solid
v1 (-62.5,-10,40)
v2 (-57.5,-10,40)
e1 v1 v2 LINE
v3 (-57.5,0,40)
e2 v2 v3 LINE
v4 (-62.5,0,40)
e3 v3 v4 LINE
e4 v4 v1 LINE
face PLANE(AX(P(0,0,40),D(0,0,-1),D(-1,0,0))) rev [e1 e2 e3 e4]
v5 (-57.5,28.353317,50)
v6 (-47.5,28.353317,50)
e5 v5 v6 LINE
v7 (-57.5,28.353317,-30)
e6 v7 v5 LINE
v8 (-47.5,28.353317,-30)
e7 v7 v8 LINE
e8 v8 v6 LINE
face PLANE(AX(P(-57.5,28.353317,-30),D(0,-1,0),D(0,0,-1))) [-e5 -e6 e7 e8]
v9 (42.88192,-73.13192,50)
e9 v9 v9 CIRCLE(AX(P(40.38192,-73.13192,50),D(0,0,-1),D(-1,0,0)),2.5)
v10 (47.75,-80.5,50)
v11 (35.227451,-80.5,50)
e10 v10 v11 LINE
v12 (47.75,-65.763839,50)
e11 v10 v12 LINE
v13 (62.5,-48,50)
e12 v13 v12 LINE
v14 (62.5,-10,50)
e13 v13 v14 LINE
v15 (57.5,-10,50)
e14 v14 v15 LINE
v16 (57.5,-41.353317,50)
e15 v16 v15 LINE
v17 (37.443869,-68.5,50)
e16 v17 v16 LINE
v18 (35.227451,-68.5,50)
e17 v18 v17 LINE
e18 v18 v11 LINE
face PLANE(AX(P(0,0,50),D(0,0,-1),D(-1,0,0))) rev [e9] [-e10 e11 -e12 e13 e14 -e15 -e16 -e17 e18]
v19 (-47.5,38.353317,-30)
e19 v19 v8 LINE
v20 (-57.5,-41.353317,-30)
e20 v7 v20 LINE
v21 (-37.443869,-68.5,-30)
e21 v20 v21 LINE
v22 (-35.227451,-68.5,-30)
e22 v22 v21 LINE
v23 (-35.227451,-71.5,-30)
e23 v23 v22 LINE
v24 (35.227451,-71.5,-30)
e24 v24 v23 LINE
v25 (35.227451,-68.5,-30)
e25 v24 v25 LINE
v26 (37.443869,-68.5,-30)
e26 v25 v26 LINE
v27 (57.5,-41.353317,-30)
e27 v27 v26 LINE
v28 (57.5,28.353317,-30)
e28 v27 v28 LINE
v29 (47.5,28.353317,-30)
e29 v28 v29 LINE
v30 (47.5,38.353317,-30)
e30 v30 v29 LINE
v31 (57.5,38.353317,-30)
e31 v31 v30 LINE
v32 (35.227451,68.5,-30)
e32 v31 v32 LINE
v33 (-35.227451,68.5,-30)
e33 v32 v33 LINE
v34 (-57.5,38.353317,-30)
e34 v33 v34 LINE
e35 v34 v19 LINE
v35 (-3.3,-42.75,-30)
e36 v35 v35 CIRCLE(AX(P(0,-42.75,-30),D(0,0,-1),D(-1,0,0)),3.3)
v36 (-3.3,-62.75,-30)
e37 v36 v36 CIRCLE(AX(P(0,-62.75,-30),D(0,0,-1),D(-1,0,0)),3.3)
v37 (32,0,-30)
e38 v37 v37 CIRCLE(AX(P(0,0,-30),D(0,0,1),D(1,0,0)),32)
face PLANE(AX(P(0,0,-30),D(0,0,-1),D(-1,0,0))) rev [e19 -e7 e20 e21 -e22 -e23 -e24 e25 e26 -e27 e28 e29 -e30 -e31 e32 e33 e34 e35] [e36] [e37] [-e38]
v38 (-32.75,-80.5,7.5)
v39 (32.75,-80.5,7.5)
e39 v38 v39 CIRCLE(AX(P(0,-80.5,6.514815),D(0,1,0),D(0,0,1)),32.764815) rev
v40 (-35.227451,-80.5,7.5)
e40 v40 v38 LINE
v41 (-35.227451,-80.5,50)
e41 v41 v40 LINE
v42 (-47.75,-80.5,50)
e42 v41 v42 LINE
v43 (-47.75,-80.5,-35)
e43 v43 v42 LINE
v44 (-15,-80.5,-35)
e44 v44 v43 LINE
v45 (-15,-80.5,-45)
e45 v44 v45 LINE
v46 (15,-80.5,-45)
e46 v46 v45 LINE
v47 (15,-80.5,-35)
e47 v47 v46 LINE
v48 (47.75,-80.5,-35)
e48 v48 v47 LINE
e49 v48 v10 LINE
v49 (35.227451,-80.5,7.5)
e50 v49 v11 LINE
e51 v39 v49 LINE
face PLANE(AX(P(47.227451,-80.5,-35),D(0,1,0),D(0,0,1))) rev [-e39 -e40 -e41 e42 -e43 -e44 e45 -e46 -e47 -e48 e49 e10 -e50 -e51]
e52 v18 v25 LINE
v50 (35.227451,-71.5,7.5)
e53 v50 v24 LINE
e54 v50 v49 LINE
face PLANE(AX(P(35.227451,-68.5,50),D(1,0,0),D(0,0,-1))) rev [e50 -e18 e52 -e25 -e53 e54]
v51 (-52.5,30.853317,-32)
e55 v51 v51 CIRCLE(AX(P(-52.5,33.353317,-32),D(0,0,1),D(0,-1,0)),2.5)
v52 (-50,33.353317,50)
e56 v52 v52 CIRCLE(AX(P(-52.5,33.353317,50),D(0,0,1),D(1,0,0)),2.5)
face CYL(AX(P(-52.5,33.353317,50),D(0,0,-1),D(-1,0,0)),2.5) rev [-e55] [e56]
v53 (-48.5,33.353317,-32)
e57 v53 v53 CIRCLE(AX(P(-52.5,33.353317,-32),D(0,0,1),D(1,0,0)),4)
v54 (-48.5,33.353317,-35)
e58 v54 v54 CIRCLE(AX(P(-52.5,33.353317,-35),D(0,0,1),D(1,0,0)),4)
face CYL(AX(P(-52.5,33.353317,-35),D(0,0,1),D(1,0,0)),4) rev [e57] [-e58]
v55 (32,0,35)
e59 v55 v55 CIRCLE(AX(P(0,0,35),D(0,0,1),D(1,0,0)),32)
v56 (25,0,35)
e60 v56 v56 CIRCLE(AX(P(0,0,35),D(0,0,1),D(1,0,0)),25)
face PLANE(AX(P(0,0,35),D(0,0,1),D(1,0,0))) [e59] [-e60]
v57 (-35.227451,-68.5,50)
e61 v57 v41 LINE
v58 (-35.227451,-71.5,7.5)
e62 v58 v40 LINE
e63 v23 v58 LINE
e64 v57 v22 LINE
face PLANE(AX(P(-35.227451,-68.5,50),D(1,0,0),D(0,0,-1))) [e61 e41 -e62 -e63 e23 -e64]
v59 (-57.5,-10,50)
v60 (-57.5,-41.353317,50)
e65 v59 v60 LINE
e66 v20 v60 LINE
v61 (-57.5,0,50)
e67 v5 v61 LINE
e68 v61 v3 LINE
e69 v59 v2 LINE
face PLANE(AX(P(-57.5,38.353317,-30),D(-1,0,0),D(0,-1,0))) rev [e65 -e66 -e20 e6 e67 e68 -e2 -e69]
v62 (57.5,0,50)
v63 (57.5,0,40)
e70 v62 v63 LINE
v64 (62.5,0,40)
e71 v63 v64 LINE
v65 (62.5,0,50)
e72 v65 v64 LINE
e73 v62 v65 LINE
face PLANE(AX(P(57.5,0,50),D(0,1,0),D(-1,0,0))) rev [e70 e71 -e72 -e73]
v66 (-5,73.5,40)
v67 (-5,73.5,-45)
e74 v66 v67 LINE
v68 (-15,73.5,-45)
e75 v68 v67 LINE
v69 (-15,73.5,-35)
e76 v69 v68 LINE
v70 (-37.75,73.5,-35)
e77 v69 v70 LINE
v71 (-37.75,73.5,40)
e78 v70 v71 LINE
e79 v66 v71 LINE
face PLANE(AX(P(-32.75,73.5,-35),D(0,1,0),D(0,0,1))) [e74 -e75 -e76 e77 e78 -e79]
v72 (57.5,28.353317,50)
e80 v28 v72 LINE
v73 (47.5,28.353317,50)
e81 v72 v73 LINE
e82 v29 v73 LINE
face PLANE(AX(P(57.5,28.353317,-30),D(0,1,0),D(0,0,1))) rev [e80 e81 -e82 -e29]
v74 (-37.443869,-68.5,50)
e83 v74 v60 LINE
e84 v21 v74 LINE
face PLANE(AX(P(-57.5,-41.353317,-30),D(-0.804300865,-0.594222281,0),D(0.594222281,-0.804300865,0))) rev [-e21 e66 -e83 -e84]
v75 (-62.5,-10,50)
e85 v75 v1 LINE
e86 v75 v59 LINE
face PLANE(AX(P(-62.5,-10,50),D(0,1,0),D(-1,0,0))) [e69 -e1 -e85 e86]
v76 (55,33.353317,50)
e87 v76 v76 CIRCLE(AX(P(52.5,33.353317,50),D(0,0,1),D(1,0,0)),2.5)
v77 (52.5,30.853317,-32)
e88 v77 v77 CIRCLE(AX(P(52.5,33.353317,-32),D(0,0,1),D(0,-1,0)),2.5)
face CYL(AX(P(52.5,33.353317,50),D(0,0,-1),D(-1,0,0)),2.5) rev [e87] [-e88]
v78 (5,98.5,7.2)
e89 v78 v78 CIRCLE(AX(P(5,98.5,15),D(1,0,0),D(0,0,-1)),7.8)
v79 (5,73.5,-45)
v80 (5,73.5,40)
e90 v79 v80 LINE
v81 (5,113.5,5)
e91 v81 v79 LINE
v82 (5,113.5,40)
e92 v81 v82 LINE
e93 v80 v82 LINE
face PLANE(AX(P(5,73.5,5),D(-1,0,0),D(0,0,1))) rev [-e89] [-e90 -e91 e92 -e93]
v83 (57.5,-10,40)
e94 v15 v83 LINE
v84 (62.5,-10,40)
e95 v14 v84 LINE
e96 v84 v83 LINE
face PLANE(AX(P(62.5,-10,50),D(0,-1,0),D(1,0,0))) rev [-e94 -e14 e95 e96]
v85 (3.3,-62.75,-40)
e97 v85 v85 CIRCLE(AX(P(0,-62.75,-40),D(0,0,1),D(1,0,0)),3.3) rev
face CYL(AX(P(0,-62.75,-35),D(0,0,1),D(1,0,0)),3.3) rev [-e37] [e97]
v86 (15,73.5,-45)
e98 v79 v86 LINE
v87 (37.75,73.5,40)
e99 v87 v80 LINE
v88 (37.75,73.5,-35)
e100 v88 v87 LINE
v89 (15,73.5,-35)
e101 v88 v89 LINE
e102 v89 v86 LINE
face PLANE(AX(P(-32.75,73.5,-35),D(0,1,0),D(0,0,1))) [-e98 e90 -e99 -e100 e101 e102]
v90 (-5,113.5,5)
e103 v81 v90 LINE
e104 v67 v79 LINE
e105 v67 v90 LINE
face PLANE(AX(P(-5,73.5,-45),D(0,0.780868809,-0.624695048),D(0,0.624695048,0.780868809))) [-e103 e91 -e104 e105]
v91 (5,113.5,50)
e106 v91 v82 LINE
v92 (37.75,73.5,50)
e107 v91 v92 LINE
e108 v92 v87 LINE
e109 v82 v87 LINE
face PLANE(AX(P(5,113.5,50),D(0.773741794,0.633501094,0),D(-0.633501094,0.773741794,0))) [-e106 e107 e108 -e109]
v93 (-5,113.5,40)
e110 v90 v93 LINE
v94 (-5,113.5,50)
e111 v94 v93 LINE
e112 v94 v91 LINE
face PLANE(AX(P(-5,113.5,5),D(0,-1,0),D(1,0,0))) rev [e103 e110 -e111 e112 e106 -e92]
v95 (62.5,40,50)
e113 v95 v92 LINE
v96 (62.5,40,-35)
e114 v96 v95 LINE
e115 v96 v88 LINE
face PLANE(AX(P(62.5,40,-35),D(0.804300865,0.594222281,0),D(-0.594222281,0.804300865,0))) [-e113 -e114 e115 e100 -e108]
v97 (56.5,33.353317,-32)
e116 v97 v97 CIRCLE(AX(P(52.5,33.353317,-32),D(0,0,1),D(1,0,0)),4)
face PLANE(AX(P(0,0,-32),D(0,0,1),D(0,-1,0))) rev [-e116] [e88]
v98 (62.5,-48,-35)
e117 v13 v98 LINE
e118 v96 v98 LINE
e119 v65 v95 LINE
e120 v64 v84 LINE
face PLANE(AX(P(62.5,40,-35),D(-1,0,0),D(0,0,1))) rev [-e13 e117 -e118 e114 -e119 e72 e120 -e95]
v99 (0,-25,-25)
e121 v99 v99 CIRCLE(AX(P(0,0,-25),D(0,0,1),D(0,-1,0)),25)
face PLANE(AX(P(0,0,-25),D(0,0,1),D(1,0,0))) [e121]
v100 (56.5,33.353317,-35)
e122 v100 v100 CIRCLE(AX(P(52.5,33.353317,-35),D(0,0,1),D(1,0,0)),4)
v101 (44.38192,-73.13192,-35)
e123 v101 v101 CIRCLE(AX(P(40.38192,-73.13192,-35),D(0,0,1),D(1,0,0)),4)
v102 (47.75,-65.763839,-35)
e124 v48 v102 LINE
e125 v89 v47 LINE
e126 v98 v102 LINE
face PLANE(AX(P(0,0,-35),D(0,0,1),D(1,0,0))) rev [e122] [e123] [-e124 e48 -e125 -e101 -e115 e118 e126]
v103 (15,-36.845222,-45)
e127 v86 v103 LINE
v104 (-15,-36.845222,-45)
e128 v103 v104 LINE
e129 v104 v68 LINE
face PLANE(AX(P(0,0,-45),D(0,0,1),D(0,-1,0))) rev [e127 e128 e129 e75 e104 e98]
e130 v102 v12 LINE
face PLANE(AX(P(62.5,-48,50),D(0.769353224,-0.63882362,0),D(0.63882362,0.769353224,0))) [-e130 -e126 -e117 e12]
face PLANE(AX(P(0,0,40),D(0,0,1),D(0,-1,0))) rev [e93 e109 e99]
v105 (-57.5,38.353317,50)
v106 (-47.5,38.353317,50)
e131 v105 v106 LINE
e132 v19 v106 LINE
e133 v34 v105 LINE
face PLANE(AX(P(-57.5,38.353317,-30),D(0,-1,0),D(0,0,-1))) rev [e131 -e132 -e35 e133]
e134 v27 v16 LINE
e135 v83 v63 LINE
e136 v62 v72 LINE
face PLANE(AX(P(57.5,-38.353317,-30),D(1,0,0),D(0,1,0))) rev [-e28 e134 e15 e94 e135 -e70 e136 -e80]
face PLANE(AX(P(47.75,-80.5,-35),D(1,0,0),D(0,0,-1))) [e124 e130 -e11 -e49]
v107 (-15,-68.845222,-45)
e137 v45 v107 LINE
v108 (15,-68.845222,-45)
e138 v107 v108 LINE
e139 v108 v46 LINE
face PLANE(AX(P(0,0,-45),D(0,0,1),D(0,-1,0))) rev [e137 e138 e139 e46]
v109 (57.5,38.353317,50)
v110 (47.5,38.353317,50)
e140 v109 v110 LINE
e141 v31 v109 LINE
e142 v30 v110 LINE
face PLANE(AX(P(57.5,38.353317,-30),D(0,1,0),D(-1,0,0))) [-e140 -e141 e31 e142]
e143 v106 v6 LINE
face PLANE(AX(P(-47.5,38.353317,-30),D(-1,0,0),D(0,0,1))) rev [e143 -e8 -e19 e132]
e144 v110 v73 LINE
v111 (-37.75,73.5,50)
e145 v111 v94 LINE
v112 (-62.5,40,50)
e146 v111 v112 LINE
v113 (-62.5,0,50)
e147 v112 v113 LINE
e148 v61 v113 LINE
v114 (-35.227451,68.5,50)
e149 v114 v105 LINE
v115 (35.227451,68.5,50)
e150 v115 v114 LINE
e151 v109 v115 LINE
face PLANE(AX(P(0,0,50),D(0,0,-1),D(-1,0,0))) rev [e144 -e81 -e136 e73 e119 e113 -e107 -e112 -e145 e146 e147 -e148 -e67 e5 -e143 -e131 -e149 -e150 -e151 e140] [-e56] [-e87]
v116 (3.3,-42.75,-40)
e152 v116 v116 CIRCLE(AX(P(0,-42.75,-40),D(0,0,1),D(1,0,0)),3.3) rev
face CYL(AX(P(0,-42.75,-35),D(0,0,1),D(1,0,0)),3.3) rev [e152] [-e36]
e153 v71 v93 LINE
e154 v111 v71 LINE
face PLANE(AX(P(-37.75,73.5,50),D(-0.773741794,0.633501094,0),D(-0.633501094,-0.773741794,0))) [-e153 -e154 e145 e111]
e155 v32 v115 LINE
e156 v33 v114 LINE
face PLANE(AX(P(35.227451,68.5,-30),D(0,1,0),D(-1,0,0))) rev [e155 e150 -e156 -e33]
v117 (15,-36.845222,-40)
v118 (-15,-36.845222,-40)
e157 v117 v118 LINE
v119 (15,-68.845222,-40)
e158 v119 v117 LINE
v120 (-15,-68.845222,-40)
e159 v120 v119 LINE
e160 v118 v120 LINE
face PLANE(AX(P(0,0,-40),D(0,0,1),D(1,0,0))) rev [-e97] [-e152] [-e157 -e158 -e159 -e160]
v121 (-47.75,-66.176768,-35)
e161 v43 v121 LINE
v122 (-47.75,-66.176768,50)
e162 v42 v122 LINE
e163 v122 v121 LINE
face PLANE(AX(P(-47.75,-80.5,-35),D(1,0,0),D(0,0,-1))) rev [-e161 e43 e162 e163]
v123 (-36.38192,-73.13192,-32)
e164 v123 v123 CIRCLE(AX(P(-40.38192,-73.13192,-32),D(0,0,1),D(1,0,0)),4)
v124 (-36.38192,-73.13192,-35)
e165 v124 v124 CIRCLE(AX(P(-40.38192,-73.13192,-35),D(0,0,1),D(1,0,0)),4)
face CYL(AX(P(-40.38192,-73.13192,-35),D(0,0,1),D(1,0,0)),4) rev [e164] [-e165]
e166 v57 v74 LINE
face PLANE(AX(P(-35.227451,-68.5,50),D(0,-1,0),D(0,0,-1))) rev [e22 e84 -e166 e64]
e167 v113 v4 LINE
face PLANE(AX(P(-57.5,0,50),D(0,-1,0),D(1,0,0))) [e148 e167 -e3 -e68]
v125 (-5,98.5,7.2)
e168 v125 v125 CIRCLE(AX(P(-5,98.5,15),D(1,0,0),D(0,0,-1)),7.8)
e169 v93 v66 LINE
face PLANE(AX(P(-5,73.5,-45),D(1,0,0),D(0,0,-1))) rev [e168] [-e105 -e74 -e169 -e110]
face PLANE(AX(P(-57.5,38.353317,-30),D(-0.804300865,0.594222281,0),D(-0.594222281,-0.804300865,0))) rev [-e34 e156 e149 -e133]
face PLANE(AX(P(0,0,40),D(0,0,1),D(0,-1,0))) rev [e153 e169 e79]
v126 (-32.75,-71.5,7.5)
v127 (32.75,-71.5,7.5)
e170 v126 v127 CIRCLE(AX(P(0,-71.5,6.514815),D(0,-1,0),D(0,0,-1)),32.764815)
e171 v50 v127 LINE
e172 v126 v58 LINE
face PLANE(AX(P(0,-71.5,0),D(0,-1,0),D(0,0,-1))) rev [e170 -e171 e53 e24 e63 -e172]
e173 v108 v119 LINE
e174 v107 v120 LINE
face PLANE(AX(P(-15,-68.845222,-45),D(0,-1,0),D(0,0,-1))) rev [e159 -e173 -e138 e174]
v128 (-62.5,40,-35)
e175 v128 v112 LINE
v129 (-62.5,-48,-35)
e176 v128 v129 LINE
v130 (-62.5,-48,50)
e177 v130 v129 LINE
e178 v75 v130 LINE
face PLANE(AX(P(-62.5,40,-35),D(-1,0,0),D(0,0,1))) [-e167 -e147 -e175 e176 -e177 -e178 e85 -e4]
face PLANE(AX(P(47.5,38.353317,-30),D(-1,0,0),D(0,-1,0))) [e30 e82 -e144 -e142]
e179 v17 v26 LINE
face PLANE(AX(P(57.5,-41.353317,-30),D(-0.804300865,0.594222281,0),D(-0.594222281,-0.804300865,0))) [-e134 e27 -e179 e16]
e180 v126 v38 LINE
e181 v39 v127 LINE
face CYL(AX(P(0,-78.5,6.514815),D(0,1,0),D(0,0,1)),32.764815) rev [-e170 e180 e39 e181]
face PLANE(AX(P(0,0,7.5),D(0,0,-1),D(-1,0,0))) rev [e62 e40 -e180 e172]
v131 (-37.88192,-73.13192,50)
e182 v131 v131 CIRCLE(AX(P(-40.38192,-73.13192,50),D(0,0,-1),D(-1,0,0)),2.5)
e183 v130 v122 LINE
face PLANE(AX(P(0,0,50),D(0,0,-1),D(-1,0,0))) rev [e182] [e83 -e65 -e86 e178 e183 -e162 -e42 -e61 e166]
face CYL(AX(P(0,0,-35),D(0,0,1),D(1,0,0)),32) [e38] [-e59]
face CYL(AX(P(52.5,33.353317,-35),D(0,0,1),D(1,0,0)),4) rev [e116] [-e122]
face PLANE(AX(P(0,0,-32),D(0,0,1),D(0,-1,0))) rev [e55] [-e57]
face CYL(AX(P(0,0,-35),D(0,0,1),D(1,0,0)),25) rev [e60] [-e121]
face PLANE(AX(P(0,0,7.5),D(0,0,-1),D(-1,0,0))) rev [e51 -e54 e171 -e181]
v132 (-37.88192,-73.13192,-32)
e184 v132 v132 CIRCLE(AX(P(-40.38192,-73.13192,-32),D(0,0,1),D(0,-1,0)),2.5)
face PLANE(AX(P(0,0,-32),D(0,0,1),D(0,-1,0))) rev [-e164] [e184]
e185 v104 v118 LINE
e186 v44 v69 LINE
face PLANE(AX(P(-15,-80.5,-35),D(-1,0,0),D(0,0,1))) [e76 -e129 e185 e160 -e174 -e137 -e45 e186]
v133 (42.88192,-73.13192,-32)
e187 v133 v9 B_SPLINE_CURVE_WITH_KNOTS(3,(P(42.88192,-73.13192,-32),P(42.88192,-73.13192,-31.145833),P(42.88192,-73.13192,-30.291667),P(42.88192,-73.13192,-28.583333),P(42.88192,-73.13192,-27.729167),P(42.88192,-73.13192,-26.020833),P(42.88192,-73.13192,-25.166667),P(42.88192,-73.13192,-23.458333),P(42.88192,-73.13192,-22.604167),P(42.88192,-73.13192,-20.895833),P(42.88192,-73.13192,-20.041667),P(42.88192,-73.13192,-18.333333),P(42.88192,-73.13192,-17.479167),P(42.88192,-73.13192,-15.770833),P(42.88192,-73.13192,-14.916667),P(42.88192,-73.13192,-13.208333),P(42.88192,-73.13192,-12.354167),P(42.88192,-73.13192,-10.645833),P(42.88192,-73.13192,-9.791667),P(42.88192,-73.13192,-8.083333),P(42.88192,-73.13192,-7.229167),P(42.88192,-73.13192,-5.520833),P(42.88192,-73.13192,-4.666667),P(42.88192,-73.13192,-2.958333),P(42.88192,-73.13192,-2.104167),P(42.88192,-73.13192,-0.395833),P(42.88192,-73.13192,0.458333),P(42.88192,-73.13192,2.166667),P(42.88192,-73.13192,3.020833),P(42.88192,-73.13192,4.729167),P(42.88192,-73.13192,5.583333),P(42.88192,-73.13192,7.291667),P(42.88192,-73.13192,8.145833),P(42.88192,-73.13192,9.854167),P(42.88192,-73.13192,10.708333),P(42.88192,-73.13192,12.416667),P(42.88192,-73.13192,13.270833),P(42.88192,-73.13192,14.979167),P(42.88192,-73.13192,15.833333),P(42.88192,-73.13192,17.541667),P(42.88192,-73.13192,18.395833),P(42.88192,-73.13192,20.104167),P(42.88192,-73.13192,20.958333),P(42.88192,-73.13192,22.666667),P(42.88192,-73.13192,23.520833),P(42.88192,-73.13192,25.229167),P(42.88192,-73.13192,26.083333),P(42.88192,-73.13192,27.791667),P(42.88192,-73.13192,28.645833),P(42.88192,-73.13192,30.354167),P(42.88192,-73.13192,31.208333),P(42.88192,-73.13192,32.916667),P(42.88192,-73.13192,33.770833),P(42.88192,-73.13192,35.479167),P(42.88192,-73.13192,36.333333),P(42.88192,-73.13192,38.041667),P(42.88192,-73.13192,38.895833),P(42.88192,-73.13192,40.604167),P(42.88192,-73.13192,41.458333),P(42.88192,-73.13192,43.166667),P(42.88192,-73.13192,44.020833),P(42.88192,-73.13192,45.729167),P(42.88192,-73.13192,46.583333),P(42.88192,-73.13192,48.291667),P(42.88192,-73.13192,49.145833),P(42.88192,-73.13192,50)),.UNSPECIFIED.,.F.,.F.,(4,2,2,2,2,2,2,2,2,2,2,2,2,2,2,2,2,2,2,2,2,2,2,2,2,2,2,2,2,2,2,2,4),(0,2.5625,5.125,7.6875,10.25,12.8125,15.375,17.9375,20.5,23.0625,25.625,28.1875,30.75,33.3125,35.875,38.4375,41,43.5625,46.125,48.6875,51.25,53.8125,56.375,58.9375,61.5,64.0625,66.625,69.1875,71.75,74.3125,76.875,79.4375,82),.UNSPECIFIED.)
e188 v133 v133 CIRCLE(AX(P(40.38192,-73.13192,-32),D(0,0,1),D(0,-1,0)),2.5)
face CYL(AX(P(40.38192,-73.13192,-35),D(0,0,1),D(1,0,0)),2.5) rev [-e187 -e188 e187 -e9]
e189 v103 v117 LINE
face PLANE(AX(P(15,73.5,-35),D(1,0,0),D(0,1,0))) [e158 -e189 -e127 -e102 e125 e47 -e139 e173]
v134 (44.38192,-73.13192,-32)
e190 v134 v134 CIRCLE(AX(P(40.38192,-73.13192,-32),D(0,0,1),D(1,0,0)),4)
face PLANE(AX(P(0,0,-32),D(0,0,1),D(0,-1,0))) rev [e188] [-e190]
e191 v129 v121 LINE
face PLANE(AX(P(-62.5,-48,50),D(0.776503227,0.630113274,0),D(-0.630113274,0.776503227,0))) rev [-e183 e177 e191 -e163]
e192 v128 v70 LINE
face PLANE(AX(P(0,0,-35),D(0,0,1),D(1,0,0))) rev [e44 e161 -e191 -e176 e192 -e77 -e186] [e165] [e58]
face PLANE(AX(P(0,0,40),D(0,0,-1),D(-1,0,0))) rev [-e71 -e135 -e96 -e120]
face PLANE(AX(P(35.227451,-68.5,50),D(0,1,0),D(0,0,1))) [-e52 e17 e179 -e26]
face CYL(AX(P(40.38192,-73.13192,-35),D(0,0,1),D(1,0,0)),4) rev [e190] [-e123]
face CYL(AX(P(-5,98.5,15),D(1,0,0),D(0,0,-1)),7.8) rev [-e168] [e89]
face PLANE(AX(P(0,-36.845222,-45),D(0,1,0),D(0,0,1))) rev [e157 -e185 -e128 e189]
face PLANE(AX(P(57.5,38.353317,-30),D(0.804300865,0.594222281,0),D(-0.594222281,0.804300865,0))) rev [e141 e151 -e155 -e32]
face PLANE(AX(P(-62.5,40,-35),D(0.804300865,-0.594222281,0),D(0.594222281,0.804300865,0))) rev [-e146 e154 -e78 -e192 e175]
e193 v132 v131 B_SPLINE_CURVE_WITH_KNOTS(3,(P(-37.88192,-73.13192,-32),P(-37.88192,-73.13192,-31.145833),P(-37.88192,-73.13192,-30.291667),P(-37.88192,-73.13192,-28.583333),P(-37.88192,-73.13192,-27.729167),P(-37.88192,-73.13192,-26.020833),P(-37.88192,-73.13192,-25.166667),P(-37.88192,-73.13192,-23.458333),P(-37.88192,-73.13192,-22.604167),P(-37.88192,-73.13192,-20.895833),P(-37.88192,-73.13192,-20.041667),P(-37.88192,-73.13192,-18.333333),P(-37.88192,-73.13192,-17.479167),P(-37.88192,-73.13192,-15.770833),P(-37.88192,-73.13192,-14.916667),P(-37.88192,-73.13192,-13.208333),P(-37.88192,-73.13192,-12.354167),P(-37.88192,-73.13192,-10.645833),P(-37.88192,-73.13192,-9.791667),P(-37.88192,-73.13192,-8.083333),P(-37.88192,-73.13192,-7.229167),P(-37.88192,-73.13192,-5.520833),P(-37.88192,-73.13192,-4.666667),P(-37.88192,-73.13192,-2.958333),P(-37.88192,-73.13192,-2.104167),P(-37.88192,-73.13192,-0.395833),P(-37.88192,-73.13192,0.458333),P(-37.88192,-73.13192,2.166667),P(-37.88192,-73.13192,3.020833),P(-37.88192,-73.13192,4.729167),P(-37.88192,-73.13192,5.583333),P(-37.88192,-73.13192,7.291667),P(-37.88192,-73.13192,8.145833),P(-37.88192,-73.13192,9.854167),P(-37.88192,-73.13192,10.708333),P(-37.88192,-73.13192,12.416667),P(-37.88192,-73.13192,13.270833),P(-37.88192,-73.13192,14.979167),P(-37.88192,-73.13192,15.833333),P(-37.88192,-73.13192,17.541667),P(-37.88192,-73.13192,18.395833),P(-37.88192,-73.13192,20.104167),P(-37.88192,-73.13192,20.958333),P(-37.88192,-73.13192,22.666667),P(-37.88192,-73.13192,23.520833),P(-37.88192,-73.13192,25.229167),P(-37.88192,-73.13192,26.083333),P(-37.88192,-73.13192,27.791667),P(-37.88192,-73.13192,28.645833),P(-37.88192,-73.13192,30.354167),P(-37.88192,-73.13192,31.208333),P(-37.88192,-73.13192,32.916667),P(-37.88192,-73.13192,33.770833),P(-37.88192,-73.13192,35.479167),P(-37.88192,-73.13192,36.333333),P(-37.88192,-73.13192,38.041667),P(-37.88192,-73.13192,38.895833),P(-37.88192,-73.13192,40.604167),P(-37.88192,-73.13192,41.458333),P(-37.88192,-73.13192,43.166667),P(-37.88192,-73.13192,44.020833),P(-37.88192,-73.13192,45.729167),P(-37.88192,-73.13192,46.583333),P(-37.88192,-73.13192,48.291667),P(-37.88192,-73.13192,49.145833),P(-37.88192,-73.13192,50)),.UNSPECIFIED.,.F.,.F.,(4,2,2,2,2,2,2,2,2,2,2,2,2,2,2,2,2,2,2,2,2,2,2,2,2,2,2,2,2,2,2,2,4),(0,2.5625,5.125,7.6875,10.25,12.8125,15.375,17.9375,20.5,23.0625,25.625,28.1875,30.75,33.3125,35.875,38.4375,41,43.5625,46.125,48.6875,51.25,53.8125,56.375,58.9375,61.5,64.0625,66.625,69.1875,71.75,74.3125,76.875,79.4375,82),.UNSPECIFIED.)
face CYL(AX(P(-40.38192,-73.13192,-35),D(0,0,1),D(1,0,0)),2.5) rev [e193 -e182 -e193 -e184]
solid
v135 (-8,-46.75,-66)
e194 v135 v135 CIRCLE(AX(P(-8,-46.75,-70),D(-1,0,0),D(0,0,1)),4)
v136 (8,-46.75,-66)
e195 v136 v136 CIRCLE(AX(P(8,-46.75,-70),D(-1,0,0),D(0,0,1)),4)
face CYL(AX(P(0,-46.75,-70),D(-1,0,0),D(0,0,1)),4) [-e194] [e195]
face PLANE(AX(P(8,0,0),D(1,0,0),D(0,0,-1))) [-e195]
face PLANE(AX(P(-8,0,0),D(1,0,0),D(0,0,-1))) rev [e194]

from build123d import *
from build123d.topology import SkipClean

# Parameters (mm, degrees)
ESTRUSIONE_ESTRUSIONE3_DEPTH       = 35
ESTRUSIONE_ESTRUSIONE3_DEPTH_BACK  = 35
SCHIZZO1_R                         = 32
SCHIZZO1_R_2                       = 25
SCHIZZO3D1_R                       = 32
ESTRUSIONE_ESTRUSIONE4_DEPTH       = 5
ESTRUSIONE_ESTRUSIONE13_DEPTH      = 80
TAGLIO_ESTRUSIONE1_START           = -73.5
TAGLIO_ESTRUSIONE1_OUTLINE_R       = 32.75
TAGLIO_ESTRUSIONE1_DEPTH           = 5
TAGLIO_ESTRUSIONE2_DEPTH           = 42.5
ESTRUSIONE_ESTRUSIONE14_DEPTH      = 80
SCHIZZO3D6_R                       = 2.5
TAGLIO_ESTRUSIONE3_DEPTH           = 136.020798627
SCHIZZO3D7_R                       = 4
TAGLIO_ESTRUSIONE4_DEPTH           = 3
TAGLIO_ESTRUSIONE5_DEPTH           = 42.5
TAGLIO_ESTRUSIONE6_DEPTH           = 10
ESTRUSIONE_ESTRUSIONE15_START      = 5
ESTRUSIONE_ESTRUSIONE15_DEPTH      = 5
TAGLIO_ESTRUSIONE7_START           = -3
TAGLIO_ESTRUSIONE7_DEPTH           = 3
TAGLIO_ESTRUSIONE8_START           = 3
TAGLIO_ESTRUSIONE8_DEPTH           = 3
TAGLIO_ESTRUSIONE9_DEPTH           = 10
ESTRUSIONE_ESTRUSIONE16_START      = -35
ESTRUSIONE_ESTRUSIONE16_OUTLINE_R  = 4
ESTRUSIONE_ESTRUSIONE16_DEPTH      = 10
TAGLIO_ESTRUSIONE10_DEPTH          = 80
ESTRUSIONE_ESTRUSIONE17_DEPTH      = 85
TAGLIO_ESTRUSIONE11_DEPTH          = 85
ESTRUSIONE_ESTRUSIONE18_DEPTH      = 85
ESTRUSIONE_ESTRUSIONE19_DEPTH      = 85
ESTRUSIONE_ESTRUSIONE21_DEPTH      = 85
TAGLIO_ESTRUSIONE15_START          = 26
TAGLIO_ESTRUSIONE15_DEPTH          = 26
ESTRUSIONE_ESTRUSIONE22_DEPTH      = 85
SCHIZZO3D26_R                      = 4
TAGLIO_ESTRUSIONE16_DEPTH          = 3
SCHIZZO3D27_R                      = 2.5
TAGLIO_ESTRUSIONE17_DEPTH          = 107
TAGLIO_ESTRUSIONE18_START          = -35
TAGLIO_ESTRUSIONE18_OUTLINE_R      = 3.3
TAGLIO_ESTRUSIONE18_DEPTH          = 5
ESTRUSIONE_ESTRUSIONE23_START      = -35
ESTRUSIONE_ESTRUSIONE23_OUTLINE_R  = 25
ESTRUSIONE_ESTRUSIONE23_DEPTH      = 10
ESTRUSIONE_ESTRUSIONE24_START      = 10
SCHIZZO3D31_R                      = 3.3
ESTRUSIONE_ESTRUSIONE24_DEPTH      = 10
TAGLIO_ESTRUSIONE19_DEPTH          = 5
ESTRUSIONE_ESTRUSIONE26_DEPTH      = 8
ESTRUSIONE_ESTRUSIONE26_DEPTH_BACK = 8
SCHIZZO3D36_R                      = 4
ESTRUSIONE_ESTRUSIONE28_DEPTH      = 40
TAGLIO_ESTRUSIONE20_DEPTH          = 40
ESTRUSIONE_ESTRUSIONE29_DEPTH      = 45
ESTRUSIONE_ESTRUSIONE30_DEPTH      = 10
SCHIZZO3D46_R                      = 7.8
TAGLIO_ESTRUSIONE21_DEPTH          = 10


# Read off the part's stored shape, not the designer's step: Taglio-Estrusione1, Estrusione-Estrusione16, Taglio-Estrusione18, Estrusione-Estrusione23
with BuildPart() as part:
    # Schizzo1 → Estrusione-Estrusione3 (new, two sides: drawn at the far end of the back side and taken through both)
    with BuildSketch(Plane.XY.offset(-ESTRUSIONE_ESTRUSIONE3_DEPTH_BACK)):
        Circle(SCHIZZO1_R)
        Circle(SCHIZZO1_R_2, mode=Mode.SUBTRACT)
    extrude(amount=ESTRUSIONE_ESTRUSIONE3_DEPTH + ESTRUSIONE_ESTRUSIONE3_DEPTH_BACK)

    # Schizzo3D1 → Estrusione-Estrusione4 (add)
    with BuildSketch(Plane(origin=(-62.5, 40, -35), x_dir=(0.6620037592711553, -0.749500515484051, 0), z_dir=(0, 0, 1))):
        Polygon((0, 0), (59.960041239, -52.960300742), (101.452901549, -56.587288919), (104.762920346, -52.839786342), (148.124166578, -3.747502577), (151.434185374, 0), (142.710511148, 40.727263694), (82.750469909, 93.687564436), (41.257609598, 97.314552613), (37.947590802, 93.567050035), (-5.41365543, 44.474766271), (-8.723674227, 40.727263694), align=None)
        with Locations(Location((71.355255574, 20.363631847, 0), (0, 0, 48.547129509))):
            Circle(SCHIZZO3D1_R, mode=Mode.SUBTRACT)
    extrude(amount=ESTRUSIONE_ESTRUSIONE4_DEPTH)

    # Schizzo3D2 → Estrusione-Estrusione13 (add)
    with BuildSketch(Plane(origin=(-37.75, 73.5, -30), x_dir=(0.4568693936855125, -0.889533786381064, 0), z_dir=(0, 0, 1))):
        Polygon((0, 0), (34.493639223, 67.159800872), (75.600538561, 73.870637396), (146.763241471, 37.321085901), (165.255105821, 0), (130.761466598, -67.159800872), (89.654567261, -73.870637396), (18.49186435, -37.321085901), align=None)
        Polygon((22.240991405, -33.625735993), (5.600144509, -0.040454124), (37.788832579, 62.631561059), (74.780971679, 68.67064944), (143.014114416, 33.625735993), (159.654961313, 0.040454124), (127.466273243, -62.631561059), (90.474134143, -68.67064944), align=None, mode=Mode.SUBTRACT)
    extrude(amount=ESTRUSIONE_ESTRUSIONE13_DEPTH)

    # Taglio-Estrusione1 outline → Taglio-Estrusione1 (cut)
    with BuildSketch(Plane(origin=(0, 0, 0), x_dir=(1, 0, 0), z_dir=(0, 1, 0)).offset(TAGLIO_ESTRUSIONE1_START)):
        with Locations((0, -7.5)):
            Circle(TAGLIO_ESTRUSIONE1_OUTLINE_R)
    extrude(amount=TAGLIO_ESTRUSIONE1_DEPTH, mode=Mode.SUBTRACT)

    # Schizzo3D4 → Taglio-Estrusione2 (cut)
    with BuildSketch(Plane(origin=(-32.75, -68.5, 50), x_dir=(0.997099088805763, -0.07611443425998218, 0), z_dir=(0, 0, -1))):
        Polygon((0, 0), (0.380572171, 4.985495444), (65.690562488, 0), (65.309990317, -4.985495444), align=None)
    extrude(amount=TAGLIO_ESTRUSIONE2_DEPTH, mode=Mode.SUBTRACT)

    # Schizzo3D5 → Estrusione-Estrusione14 (add)
    with BuildSketch(Plane(origin=(-57.5, -38.353317087, -30), x_dir=(0.8319168268807552, 0.5549003452446715, 0), z_dir=(0, 0, 1))):
        Polygon((0, 0), (5.549003452, 8.319168269), (13.868171721, 2.770164816), (8.319168269, -5.549003452), align=None)
        Polygon((42.564537786, 63.813539703), (50.883706055, 58.264536251), (45.334702602, 49.945367982), (37.015534334, 55.494371434), align=None)
        Polygon((95.670435091, -63.813539703), (101.219438544, -55.494371434), (92.900270275, -49.945367982), (87.351266822, -58.264536251), align=None)
        Polygon((132.685969425, -8.319168269), (124.366801156, -2.770164816), (129.915804608, 5.549003452), (138.234972877, 0), align=None)
    extrude(amount=ESTRUSIONE_ESTRUSIONE14_DEPTH)

    # Schizzo3D6 → Taglio-Estrusione3 (cut)
    with BuildSketch(Plane(origin=(-52.5, 33.353317087, 50), x_dir=(0.8440673996564301, -0.5362370975951147, 0), z_dir=(0, 0, -1))):
        with Locations(Location((0, 0, 0), (0, 0, 327.572152721))):
            Circle(SCHIZZO3D6_R)
        with Locations(Location((35.7705719, 56.304895247, 0), (0, 0, 327.572152721))):
            Circle(SCHIZZO3D6_R)
        with Locations(Location((124.397648864, 0, 0), (0, 0, 327.572152721))):
            Circle(SCHIZZO3D6_R)
        with Locations(Location((88.627076964, -56.304895247, 0), (0, 0, 327.572152721))):
            Circle(SCHIZZO3D6_R)
    extrude(amount=TAGLIO_ESTRUSIONE3_DEPTH, mode=Mode.SUBTRACT)

    # Schizzo3D7 → Taglio-Estrusione4 (cut)
    with BuildSketch(Plane(origin=(52.5, 33.353317087, -35), x_dir=(-0.8440673996564301, -0.5362370975951145, 0), z_dir=(0, 0, 1))):
        with Locations(Location((0, 0, 0), (0, 0, 147.572152721))):
            Circle(SCHIZZO3D7_R)
        with Locations(Location((35.7705719, 56.304895247, 0), (0, 0, 147.572152721))):
            Circle(SCHIZZO3D7_R)
        with Locations(Location((124.397648864, 0, 0), (0, 0, 147.572152721))):
            Circle(SCHIZZO3D7_R)
        with Locations(Location((88.627076964, -56.304895247, 0), (0, 0, 147.572152721))):
            Circle(SCHIZZO3D7_R)
    extrude(amount=TAGLIO_ESTRUSIONE4_DEPTH, mode=Mode.SUBTRACT)

    # Schizzo3D8 → Taglio-Estrusione5 (cut)
    with BuildSketch(Plane(origin=(-35.227450684, -68.5, 50), x_dir=(0.9974912873801347, -0.07078934666121361, 0), z_dir=(0, 0, -1))):
        Polygon((0, 0), (2.471235472, -0.175377115), (2.825182205, 4.812079322), (0.353946733, 4.987456437), align=None)
        Polygon((70.632097001, 0), (68.160861529, 0.175377115), (67.806914795, -4.812079322), (70.278150268, -4.987456437), align=None)
    extrude(amount=TAGLIO_ESTRUSIONE5_DEPTH, mode=Mode.SUBTRACT)

    # Schizzo3D9 → Taglio-Estrusione6 (cut)
    with BuildSketch(Plane(origin=(-62.5, 0, 50), x_dir=(0.9968152785361251, -0.07974522228289001, 0), z_dir=(0, 0, -1))):
        Polygon((0, 0), (0.797452223, 9.968152785), (5.781528616, 9.569426674), (4.984076393, -0.398726111), align=None)
        Polygon((124.601909817, -9.968152785), (125.39936204, 0), (120.415285647, 0.398726111), (119.617833424, -9.569426674), align=None)
    extrude(amount=TAGLIO_ESTRUSIONE6_DEPTH, mode=Mode.SUBTRACT)

    # Schizzo3D10 → Estrusione-Estrusione15 (add)
    with BuildSketch(Plane(origin=(-32.75, -73.5, 7.5), x_dir=(0.856419201008807, 0, -0.5162810786223304), z_dir=(0, -1, 0)).offset(ESTRUSIONE_ESTRUSIONE15_START)):
        with BuildLine():
            Line((0, 0), (-2.121736335, -1.279060911))
            Line((-2.121736335, -1.279060911), (-24.063682177, 35.118755132))
            Line((-24.063682177, 35.118755132), (-26.224041846, 33.81641065))
            Line((-26.224041846, 33.81641065), (17.659849836, -38.979221436))
            Line((17.659849836, -38.979221436), (82.319499513, 0))
            Line((82.319499513, 0), (38.43560783, 72.795632086))
            Line((38.43560783, 72.795632086), (36.27524816, 71.493287604))
            Line((36.27524816, 71.493287604), (58.217194001, 35.095471561))
            Line((58.217194001, 35.095471561), (56.095457666, 33.81641065))
            ThreePointArc((56.095457666, 33.81641065), (44.955934158, -11.139523508), (0, 0))
        make_face()
    extrude(amount=-ESTRUSIONE_ESTRUSIONE15_DEPTH)

    # Schizzo3D11 → Taglio-Estrusione7 (cut)
    with BuildSketch(Plane(origin=(32.75, -68.5, 7.5), x_dir=(-1, 0, 0), z_dir=(0, 1, 0)).offset(TAGLIO_ESTRUSIONE7_START)):
        with BuildLine():
            Line((0, 0), (-2.477450684, 0))
            ThreePointArc((-2.477450684, 0), (32.75, -35.227450684), (67.977450684, 0))
            Line((67.977450684, 0), (65.5, 0))
            ThreePointArc((65.5, 0), (32.75, -32.75), (0, 0))
        make_face()
    extrude(amount=TAGLIO_ESTRUSIONE7_DEPTH, mode=Mode.SUBTRACT)

    # Schizzo3D12 → Taglio-Estrusione8 (cut)
    with BuildSketch(Plane(origin=(35.227450684, -68.5, 7.5), x_dir=(-0.8827477435104474, 0, -0.46984723190332145), z_dir=(0, -1, 0)).offset(TAGLIO_ESTRUSIONE8_START)):
        with BuildLine():
            Line((0, 0), (17.619271196, 33.103040382))
            Line((17.619271196, 33.103040382), (79.813176398, 0))
            Line((79.813176398, 0), (62.193905202, -33.103040382))
            ThreePointArc((62.193905202, -33.103040382), (14.54543241, -47.648472792), (0, 0))
        make_face()
    extrude(amount=-TAGLIO_ESTRUSIONE8_DEPTH, mode=Mode.SUBTRACT)

    # Schizzo3D13 → Taglio-Estrusione9 (cut)
    with BuildSketch(Plane(origin=(32.75, -78.5, 7.5), x_dir=(-1, 0, 0), z_dir=(0, -1, 0))):
        with BuildLine():
            ThreePointArc((0, 0), (32.75, 32.75), (65.5, 0))
            ThreePointArc((65.5, 0), (32.75, 33.75), (0, 0))
        make_face()
    extrude(amount=-TAGLIO_ESTRUSIONE9_DEPTH, mode=Mode.SUBTRACT)

    # Estrusione-Estrusione16 outline → Estrusione-Estrusione16 (add)
    with BuildSketch(Plane.XY.offset(ESTRUSIONE_ESTRUSIONE16_START)):
        with Locations((52.5, -33.353317087)):
            Circle(ESTRUSIONE_ESTRUSIONE16_OUTLINE_R)
        with Locations((-52.5, -33.353317087)):
            Circle(ESTRUSIONE_ESTRUSIONE16_OUTLINE_R)
    extrude(amount=ESTRUSIONE_ESTRUSIONE16_DEPTH)

    # Schizzo3D15 → Taglio-Estrusione10 (cut)
    with BuildSketch(Plane(origin=(-57.5, -38.353317087, 50), x_dir=(0.9962405881956831, 0.08662961636484198, 0), z_dir=(0, 0, 1))):
        Polygon((0, 0), (0.866296164, 9.962405882), (10.828702046, 9.096109718), (9.962405882, -0.866296164), align=None)
        Polygon((104.605261761, -9.096109718), (105.471557924, 0.866296164), (115.433963806, 0), (114.567667643, -9.962405882), align=None)
    extrude(amount=-TAGLIO_ESTRUSIONE10_DEPTH, mode=Mode.SUBTRACT)

    # Schizzo3D16 → Estrusione-Estrusione17 (add)
    with BuildSketch(Plane(origin=(-62.5, -40, 50), x_dir=(0.9979469235950233, -0.06404637138221654, 0), z_dir=(0, 0, -1))):
        Polygon((0, 0), (0.512370971, 7.983575389), (27.164971657, 36.835808867), (26.8447398, 31.846074249), align=None)
        Polygon((102.163724437, 32.022528861), (101.84349258, 27.032794243), (124.397125498, -7.983575389), (124.909496469, 0), align=None)
    extrude(amount=ESTRUSIONE_ESTRUSIONE17_DEPTH)

    # Schizzo3D17 → Taglio-Estrusione11 (cut)
    with BuildSketch(Plane(origin=(-57.5, -38.353317087, -30), x_dir=(0.9996599089213338, -0.026078084580556556, 0), z_dir=(0, 0, -1))):
        Polygon((0, 0), (0.078234254, 2.998979727), (23.129376621, 32.554584597), (23.051142368, 29.55560487), align=None)
        Polygon((93.560316906, 30.71725572), (93.482082652, 27.718275993), (114.960889526, -2.998979727), (115.03912378, 0), align=None)
    extrude(amount=-TAGLIO_ESTRUSIONE11_DEPTH, mode=Mode.SUBTRACT)

    # Schizzo3D18 → Estrusione-Estrusione18 (add)
    with BuildSketch(Plane(origin=(35.227450684, -78.5, 50), x_dir=(-0.9923639585819584, 0.12334412717087637, 0), z_dir=(0, 0, -1))):
        Polygon((0, 0), (-9.923639586, 1.233441272), (-8.690198314, 11.157080858), (1.233441272, 9.923639586), align=None)
        Polygon((69.916904823, -8.690198314), (79.840544409, -9.923639586), (81.07398568, 0), (71.150346094, 1.233441272), align=None)
    extrude(amount=ESTRUSIONE_ESTRUSIONE18_DEPTH)

    # Schizzo3D21 → Estrusione-Estrusione19 (add)
    with BuildSketch(Plane(origin=(47.227450684, -68.857806459, -35), x_dir=(-0.9924893703590384, -0.12233090257297884, 0), z_dir=(0, 0, -1))):
        Polygon((0, 0), (-0.301502427, 2.446135418), (1.984978741, 0.244661805), (3.164516979, -9.325112791), (92.940045084, 1.740316936), (91.760506845, 11.310091532), (93.443983159, 14.000888755), (93.745485586, 11.554753337), (95.16968563, 0), (1.424200044, -11.554753337), align=None)
    extrude(amount=-ESTRUSIONE_ESTRUSIONE19_DEPTH)

    # Schizzo3D22 → Estrusione-Estrusione21 (add)
    with BuildSketch(Plane(origin=(62.5, -40, 50), x_dir=(-0.5008471058505845, -0.8655357742815103, -1.820429507942214e-15), z_dir=(0, 0, 1))):
        Polygon((0, 0), (0.58023617, -0.065095709), (7.098056235, 3.706477244), (30.493436296, 0), (6.924286194, 4.006776847), align=None)
    extrude(amount=-ESTRUSIONE_ESTRUSIONE21_DEPTH)

    # Schizzo3D23 → Taglio-Estrusione15 (cut)
    with SkipClean():  # the faces are left unmerged after this step: merging them gives an invalid solid
        with BuildSketch(Plane(origin=(35.227450684, -78.5, 50), x_dir=(-0.8562730712113631, 0, -0.5165234046180869), z_dir=(0, -1, 0)).offset(TAGLIO_ESTRUSIONE15_START)):
            with BuildLine():
                Line((0, 0), (21.952244696, 36.391605526))
                Line((21.952244696, 36.391605526), (24.073619002, 35.111944264))
                ThreePointArc((24.073619002, 35.111944264), (69.54922699, 47.095018917), (80.159505166, 1.279661262))
                Line((80.159505166, 1.279661262), (82.280879472, 0))
                Line((82.280879472, 0), (60.328634776, -36.391605526))
                Line((60.328634776, -36.391605526), (0, 0))
            make_face()
        extrude(amount=-TAGLIO_ESTRUSIONE15_DEPTH, mode=Mode.SUBTRACT)

    # Schizzo3D24 → Estrusione-Estrusione22 (add)
    with SkipClean():  # the faces are left unmerged after this step: merging them gives an invalid solid
        with BuildSketch(Plane(origin=(47.75, -80.5, -35), x_dir=(-0.9883033934558069, 0.1525004999458584, 1.4218125797153324e-14), z_dir=(0, 0, 1))):
            Polygon((0, 0), (0.516437262, 0.079689032), (2.667737416, -13.862148816), (2.247271892, -14.563797745), align=None)
            Polygon((96.630245967, 0), (96.017836966, 0.542270865), (93.866536813, 14.484108713), (94.382974075, 14.563797745), align=None)
        extrude(amount=ESTRUSIONE_ESTRUSIONE22_DEPTH)

    # Schizzo3D26 → Taglio-Estrusione16 (cut)
    with SkipClean():  # the faces are left unmerged after this step: merging them gives an invalid solid
        with BuildSketch(Plane(origin=(0, -80.5, -35), x_dir=(0.9837586148440444, 0.1794964838656379, -7.944923026532018e-15), z_dir=(0, 0, 1))):
            with Locations(Location((41.048605807, 0, 0), (0, 0, 349.659567204))):
                Circle(SCHIZZO3D26_R)
            with Locations(Location((-38.403516754, 14.496825156, 0), (0, 0, 349.659567204))):
                Circle(SCHIZZO3D26_R)
        extrude(amount=TAGLIO_ESTRUSIONE16_DEPTH, mode=Mode.SUBTRACT)

    # Schizzo3D27 → Taglio-Estrusione17 (cut)
    with SkipClean():  # the faces are left unmerged after this step: merging them gives an invalid solid
        with BuildSketch(Plane(origin=(0, -80.5, -35), x_dir=(-0.9837586148440446, 0.17949648386563652, 6.761636618325122e-15), z_dir=(0, 0, -1))):
            with Locations(Location((41.048605807, 0, 0), (0, 0, 169.659567204))):
                Circle(SCHIZZO3D27_R)
            with Locations(Location((-38.403516754, 14.496825156, 0), (0, 0, 169.659567204))):
                Circle(SCHIZZO3D27_R)
        extrude(amount=-TAGLIO_ESTRUSIONE17_DEPTH, mode=Mode.SUBTRACT)

    # Taglio-Estrusione18 outline → Taglio-Estrusione18 (cut)
    with SkipClean():  # the faces are left unmerged after this step: merging them gives an invalid solid
        with BuildSketch(Plane.XY.offset(TAGLIO_ESTRUSIONE18_START)):
            with Locations((0, -62.75)):
                Circle(TAGLIO_ESTRUSIONE18_OUTLINE_R)
            with Locations((0, -42.75)):
                Circle(TAGLIO_ESTRUSIONE18_OUTLINE_R)
        extrude(amount=TAGLIO_ESTRUSIONE18_DEPTH, mode=Mode.SUBTRACT)

    # Estrusione-Estrusione23 outline → Estrusione-Estrusione23 (add)
    with SkipClean():  # the faces are left unmerged after this step: merging them gives an invalid solid
        with BuildSketch(Plane.XY.offset(ESTRUSIONE_ESTRUSIONE23_START)):
            Circle(ESTRUSIONE_ESTRUSIONE23_OUTLINE_R)
        extrude(amount=ESTRUSIONE_ESTRUSIONE23_DEPTH)

    # Schizzo3D31 → Estrusione-Estrusione24 (add)
    with SkipClean():  # the faces are left unmerged after this step: merging them gives an invalid solid
        with BuildSketch(Plane(origin=(0, -80.5, -35), x_dir=(-0.09694381708766091, 0.9952898554333176, 0), z_dir=(0, 0, -1)).offset(ESTRUSIONE_ESTRUSIONE24_START)):
            Polygon((0, 0), (1.454157256, -14.929347831), (154.728794993, 0), (151.82048048, 29.858695663), (-1.454157256, 14.929347831), align=None)
            with Locations(Location((37.572192043, 3.659629095, 0), (0, 0, 95.563208821))):
                Circle(SCHIZZO3D31_R, mode=Mode.SUBTRACT)
            with Locations(Location((17.666394934, 1.720752753, 0), (0, 0, 95.563208821))):
                Circle(SCHIZZO3D31_R, mode=Mode.SUBTRACT)
        extrude(amount=-ESTRUSIONE_ESTRUSIONE24_DEPTH)

    # Schizzo3D33 → Taglio-Estrusione19 (cut)
    with SkipClean():  # the faces are left unmerged after this step: merging them gives an invalid solid
        with BuildSketch(Plane(origin=(0, -36.845222271, -45), x_dir=(0.42443387623072, -0.9054589359588683, 0), z_dir=(0, 0, -1))):
            Polygon((0, 0), (-6.366508143, 13.581884039), (22.608177807, 27.163768079), (35.341194094, 0), (6.366508143, -13.581884039), align=None)
        extrude(amount=-TAGLIO_ESTRUSIONE19_DEPTH, mode=Mode.SUBTRACT)

    # Schizzo3D42 → Estrusione-Estrusione28 (add)
    with SkipClean():  # the faces are left unmerged after this step: merging them gives an invalid solid
        with BuildSketch(Plane(origin=(0, 73.5, -45), x_dir=(0.09950371902099993, 0, 0.9950371902099892), z_dir=(0, -1, 0))):
            Polygon((0, 0), (-0.497518595, 4.975185951), (49.254340915, 9.950371902), (50.249378106, 0), (0.497518595, -4.975185951), align=None)
        extrude(amount=-ESTRUSIONE_ESTRUSIONE28_DEPTH)

    # Schizzo3D43 → Taglio-Estrusione20 (cut)
    with SkipClean():  # the faces are left unmerged after this step: merging them gives an invalid solid
        with BuildSketch(Plane(origin=(-5, 73.5, -45), x_dir=(0, 0.6246950475544246, 0.7808688094430302), z_dir=(-1, 0, 0))):
            Polygon((0, 0), (64.031242374, 0), (24.987801902, 31.234752378), align=None)
        extrude(amount=-TAGLIO_ESTRUSIONE20_DEPTH, mode=Mode.SUBTRACT)

    # Schizzo3D44 → Estrusione-Estrusione29 (add)
    with SkipClean():  # the faces are left unmerged after this step: merging them gives an invalid solid
        with BuildSketch(Plane(origin=(-5, 113.5, 5), x_dir=(0.24253562503633308, -0.970142500145332, 0), z_dir=(0, 0, 1))):
            Polygon((0, 0), (2.42535625, 9.701425001), (41.231056256, 0), (38.805700006, -9.701425001), align=None)
        extrude(amount=ESTRUSIONE_ESTRUSIONE29_DEPTH)

    # Schizzo3D45 → Estrusione-Estrusione30 (add)
    with SkipClean():  # the faces are left unmerged after this step: merging them gives an invalid solid
        with BuildSketch(Plane(origin=(5, 113.5, 50), x_dir=(-0.7302026886566491, -0.6832305858775652, -1.1852161368272007e-15), z_dir=(0, 0, 1))):
            Polygon((0, 0), (3.415085382, 51.583909234), (27.329223435, 29.208107546), align=None)
            Polygon((58.545388375, 0), (7.302026887, -6.832305859), (34.631250322, 22.375801687), align=None)
        extrude(amount=-ESTRUSIONE_ESTRUSIONE30_DEPTH)

    # Schizzo3D46 → Taglio-Estrusione21 (cut)
    with SkipClean():  # the faces are left unmerged after this step: merging them gives an invalid solid
        with BuildSketch(Plane(origin=(-5, 113.5, 15), x_dir=(0, -1, 0), z_dir=(-1, 0, 0))):
            with Locations(Location((15, 0, 0), (0, 0, 270))):
                Circle(SCHIZZO3D46_R)
        extrude(amount=-TAGLIO_ESTRUSIONE21_DEPTH, mode=Mode.SUBTRACT)


with BuildPart() as body_2:
    # Schizzo3D36 → Estrusione-Estrusione26 (new, two sides: drawn at the far end of the back side and taken through both)
    with BuildSketch(Plane(origin=(0, -59.45, -40), x_dir=(0, 0.3898402571981868, -0.9208824973185512), z_dir=(1, 0, 0)).offset(-ESTRUSIONE_ESTRUSIONE26_DEPTH_BACK)):
        with Locations(Location((32.577446186, 0, 0), (0, 0, 157.055439895))):
            Circle(SCHIZZO3D36_R)
    extrude(amount=ESTRUSIONE_ESTRUSIONE26_DEPTH + ESTRUSIONE_ESTRUSIONE26_DEPTH_BACK)


solid = Compound([part.part, body_2.part])
